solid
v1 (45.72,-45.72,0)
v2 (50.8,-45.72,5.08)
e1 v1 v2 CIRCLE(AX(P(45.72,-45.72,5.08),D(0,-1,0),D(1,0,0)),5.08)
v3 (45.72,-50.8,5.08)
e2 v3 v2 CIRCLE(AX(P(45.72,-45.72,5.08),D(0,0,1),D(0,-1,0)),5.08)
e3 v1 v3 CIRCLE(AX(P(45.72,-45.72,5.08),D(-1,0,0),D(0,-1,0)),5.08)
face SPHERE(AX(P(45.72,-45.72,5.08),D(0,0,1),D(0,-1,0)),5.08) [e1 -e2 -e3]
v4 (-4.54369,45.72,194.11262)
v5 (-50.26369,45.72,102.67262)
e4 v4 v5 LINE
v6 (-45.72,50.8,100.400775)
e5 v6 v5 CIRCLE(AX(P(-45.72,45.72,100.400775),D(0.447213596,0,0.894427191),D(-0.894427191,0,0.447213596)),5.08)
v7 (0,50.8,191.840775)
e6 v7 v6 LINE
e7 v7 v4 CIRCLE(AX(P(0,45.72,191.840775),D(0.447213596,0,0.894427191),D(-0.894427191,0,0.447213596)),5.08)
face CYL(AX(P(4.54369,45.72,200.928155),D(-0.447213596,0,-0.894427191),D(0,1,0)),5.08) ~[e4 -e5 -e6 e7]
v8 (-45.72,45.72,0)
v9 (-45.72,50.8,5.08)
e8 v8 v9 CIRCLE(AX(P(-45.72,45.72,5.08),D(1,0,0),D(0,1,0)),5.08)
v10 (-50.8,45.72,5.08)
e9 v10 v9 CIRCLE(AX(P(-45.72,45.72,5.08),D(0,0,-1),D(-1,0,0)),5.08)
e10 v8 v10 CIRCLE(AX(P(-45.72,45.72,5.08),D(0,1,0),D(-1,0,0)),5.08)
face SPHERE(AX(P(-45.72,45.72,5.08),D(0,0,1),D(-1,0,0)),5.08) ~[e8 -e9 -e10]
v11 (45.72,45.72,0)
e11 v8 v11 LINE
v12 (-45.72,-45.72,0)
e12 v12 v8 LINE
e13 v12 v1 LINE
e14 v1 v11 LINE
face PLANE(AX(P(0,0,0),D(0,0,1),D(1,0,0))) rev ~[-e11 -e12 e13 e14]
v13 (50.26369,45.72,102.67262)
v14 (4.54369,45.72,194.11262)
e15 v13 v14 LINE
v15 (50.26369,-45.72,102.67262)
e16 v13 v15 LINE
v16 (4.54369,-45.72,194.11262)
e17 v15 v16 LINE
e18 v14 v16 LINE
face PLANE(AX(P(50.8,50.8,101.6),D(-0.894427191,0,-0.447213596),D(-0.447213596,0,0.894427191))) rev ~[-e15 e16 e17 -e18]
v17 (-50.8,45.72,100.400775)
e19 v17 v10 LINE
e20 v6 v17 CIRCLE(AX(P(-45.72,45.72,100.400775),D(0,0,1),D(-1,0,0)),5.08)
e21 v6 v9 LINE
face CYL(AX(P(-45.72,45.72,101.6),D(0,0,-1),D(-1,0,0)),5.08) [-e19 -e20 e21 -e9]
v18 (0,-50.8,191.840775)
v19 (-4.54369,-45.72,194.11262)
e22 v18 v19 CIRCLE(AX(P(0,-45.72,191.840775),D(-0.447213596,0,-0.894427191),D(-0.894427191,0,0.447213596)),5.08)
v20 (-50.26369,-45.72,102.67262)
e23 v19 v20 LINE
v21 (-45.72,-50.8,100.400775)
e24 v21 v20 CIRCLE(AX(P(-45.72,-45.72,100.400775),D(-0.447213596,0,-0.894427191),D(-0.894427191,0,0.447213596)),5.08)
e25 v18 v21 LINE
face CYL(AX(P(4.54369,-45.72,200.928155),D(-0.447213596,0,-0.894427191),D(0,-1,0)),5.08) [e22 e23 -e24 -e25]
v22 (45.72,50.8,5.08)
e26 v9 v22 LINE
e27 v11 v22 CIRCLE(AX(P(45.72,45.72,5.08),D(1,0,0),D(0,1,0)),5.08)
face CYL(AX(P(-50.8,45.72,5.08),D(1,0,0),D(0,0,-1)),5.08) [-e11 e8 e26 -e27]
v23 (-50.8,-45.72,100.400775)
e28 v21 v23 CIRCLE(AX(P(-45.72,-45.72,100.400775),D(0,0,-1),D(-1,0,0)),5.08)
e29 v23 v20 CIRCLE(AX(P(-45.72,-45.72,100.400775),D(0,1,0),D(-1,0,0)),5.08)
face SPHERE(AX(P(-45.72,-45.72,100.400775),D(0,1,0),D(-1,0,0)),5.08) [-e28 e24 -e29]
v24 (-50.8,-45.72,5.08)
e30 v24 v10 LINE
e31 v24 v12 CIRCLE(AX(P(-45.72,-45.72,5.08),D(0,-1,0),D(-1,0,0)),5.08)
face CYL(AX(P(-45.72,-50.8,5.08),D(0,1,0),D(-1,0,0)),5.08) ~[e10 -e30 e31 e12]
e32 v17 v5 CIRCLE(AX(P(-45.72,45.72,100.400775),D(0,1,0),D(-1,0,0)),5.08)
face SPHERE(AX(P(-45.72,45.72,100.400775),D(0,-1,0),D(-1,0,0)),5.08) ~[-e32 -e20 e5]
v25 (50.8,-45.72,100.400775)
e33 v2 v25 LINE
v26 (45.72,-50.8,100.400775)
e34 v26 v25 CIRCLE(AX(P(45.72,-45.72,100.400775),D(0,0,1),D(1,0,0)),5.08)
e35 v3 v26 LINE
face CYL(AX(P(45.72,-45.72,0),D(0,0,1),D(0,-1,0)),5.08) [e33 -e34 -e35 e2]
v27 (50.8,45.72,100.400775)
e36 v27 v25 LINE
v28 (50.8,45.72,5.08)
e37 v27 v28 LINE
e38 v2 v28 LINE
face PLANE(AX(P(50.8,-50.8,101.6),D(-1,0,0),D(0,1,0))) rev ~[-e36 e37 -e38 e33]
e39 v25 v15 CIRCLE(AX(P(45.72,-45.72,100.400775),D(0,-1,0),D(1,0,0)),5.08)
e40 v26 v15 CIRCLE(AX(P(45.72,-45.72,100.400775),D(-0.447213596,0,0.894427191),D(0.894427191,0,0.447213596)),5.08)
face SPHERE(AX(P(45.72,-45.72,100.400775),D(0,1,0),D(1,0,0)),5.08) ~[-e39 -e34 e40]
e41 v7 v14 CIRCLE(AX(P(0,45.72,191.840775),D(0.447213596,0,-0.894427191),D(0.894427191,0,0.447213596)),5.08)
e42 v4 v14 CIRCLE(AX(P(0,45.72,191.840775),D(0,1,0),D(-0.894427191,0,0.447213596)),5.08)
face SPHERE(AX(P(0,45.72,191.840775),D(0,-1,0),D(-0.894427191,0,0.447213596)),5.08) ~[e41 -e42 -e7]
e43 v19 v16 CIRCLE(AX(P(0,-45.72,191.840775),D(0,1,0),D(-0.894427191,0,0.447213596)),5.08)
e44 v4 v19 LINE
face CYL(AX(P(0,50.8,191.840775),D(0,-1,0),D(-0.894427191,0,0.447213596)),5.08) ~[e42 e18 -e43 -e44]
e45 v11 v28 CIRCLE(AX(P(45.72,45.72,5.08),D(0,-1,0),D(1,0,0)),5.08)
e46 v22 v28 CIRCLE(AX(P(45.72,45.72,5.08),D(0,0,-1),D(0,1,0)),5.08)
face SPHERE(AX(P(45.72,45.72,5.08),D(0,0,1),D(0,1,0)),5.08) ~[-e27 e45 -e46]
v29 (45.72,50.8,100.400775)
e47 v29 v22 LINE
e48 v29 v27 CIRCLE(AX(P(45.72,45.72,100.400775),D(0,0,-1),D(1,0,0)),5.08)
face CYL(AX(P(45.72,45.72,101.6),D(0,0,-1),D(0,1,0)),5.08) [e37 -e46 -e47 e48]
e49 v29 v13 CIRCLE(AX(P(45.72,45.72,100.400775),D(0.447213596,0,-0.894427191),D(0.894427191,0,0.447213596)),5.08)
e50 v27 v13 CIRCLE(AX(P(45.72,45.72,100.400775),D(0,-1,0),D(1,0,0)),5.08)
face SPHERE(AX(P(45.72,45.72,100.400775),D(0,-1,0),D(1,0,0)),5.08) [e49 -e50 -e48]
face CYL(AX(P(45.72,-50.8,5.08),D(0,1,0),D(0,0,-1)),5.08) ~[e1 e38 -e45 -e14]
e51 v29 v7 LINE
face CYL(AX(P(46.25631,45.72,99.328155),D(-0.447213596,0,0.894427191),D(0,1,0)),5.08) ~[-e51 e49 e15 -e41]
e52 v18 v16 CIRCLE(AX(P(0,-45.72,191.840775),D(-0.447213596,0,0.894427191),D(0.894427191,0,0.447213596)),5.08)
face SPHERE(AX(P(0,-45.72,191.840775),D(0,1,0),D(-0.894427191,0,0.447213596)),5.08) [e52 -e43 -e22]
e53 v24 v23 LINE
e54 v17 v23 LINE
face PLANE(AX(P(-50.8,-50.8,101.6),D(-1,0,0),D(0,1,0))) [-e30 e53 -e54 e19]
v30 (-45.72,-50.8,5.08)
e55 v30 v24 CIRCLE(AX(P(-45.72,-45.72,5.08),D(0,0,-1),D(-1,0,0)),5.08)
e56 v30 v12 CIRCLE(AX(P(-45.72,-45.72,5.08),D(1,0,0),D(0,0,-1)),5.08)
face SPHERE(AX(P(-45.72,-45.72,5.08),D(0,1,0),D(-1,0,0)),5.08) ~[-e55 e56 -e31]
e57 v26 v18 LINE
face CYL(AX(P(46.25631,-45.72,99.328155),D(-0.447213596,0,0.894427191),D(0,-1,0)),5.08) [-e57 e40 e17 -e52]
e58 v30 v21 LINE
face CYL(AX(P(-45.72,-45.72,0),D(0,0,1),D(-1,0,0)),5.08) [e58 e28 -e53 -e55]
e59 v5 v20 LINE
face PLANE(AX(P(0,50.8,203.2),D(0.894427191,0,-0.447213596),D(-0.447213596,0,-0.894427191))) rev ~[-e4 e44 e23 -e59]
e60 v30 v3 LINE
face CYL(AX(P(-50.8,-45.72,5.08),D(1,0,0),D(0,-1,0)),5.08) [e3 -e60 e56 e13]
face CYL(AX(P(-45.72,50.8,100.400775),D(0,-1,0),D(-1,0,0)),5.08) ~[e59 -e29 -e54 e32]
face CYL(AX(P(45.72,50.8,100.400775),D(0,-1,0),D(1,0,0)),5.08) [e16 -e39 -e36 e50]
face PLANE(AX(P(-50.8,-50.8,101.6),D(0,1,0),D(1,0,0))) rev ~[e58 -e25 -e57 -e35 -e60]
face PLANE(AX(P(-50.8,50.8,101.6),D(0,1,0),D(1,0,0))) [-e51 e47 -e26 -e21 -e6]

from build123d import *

# Parameters (mm, degrees)
F0_W     = 101.6
F0_H     = 101.6
F1_DEPTH = 101.6
F2_W     = 101.6
F2_H     = 101.6
F3_DEPTH = 101.6
F5_DEPTH = 101.6
F6_R     = 5.08


with BuildPart() as f1:
    # F0 (on Top) → F1 (new body)
    with BuildSketch(Plane.XY):
        Rectangle(F0_W, F0_H)
    extrude(amount=F1_DEPTH)

    # F2 (on face) → F3 (join)
    with BuildSketch(Plane.XY.offset(101.6)):
        Rectangle(F2_W, F2_H)
    extrude(amount=F3_DEPTH)

    # F4 (on face) → F5 (cut)
    with BuildSketch(Plane(origin=(0, 50.8, 0), x_dir=(-1, 0, 0), z_dir=(0, 1, 0))):
        Polygon((-50.8, 101.6), (0, 203.2), (-50.8, 203.2), align=None)
        Polygon((50.8, 203.2), (0, 203.2), (50.8, 101.6), align=None)
    extrude(amount=-F5_DEPTH, mode=Mode.SUBTRACT)

    # F6
    f6_edges = [f1.edges().sort_by_distance(p)[0] for p in [
        (25.4, 50.8, 152.4),
        (50.8, 0, 101.6),
        (50.8, 50.8, 50.8),
        (0, 0, 203.2),
        (-50.8, 0, 101.6),
        (-50.8, 50.8, 50.8),
        (-50.8, 0, 0),
        (0, 50.8, 0),
        (-50.8, -50.8, 50.8),
        (50.8, -50.8, 50.8),
        (-25.4, -50.8, 152.4),
        (-25.4, 50.8, 152.4),
        (0, -50.8, 0),
        (50.8, 0, 0),
        (25.4, -50.8, 152.4),
    ]]
    fillet(f6_edges, radius=F6_R)


solid = f1.part
